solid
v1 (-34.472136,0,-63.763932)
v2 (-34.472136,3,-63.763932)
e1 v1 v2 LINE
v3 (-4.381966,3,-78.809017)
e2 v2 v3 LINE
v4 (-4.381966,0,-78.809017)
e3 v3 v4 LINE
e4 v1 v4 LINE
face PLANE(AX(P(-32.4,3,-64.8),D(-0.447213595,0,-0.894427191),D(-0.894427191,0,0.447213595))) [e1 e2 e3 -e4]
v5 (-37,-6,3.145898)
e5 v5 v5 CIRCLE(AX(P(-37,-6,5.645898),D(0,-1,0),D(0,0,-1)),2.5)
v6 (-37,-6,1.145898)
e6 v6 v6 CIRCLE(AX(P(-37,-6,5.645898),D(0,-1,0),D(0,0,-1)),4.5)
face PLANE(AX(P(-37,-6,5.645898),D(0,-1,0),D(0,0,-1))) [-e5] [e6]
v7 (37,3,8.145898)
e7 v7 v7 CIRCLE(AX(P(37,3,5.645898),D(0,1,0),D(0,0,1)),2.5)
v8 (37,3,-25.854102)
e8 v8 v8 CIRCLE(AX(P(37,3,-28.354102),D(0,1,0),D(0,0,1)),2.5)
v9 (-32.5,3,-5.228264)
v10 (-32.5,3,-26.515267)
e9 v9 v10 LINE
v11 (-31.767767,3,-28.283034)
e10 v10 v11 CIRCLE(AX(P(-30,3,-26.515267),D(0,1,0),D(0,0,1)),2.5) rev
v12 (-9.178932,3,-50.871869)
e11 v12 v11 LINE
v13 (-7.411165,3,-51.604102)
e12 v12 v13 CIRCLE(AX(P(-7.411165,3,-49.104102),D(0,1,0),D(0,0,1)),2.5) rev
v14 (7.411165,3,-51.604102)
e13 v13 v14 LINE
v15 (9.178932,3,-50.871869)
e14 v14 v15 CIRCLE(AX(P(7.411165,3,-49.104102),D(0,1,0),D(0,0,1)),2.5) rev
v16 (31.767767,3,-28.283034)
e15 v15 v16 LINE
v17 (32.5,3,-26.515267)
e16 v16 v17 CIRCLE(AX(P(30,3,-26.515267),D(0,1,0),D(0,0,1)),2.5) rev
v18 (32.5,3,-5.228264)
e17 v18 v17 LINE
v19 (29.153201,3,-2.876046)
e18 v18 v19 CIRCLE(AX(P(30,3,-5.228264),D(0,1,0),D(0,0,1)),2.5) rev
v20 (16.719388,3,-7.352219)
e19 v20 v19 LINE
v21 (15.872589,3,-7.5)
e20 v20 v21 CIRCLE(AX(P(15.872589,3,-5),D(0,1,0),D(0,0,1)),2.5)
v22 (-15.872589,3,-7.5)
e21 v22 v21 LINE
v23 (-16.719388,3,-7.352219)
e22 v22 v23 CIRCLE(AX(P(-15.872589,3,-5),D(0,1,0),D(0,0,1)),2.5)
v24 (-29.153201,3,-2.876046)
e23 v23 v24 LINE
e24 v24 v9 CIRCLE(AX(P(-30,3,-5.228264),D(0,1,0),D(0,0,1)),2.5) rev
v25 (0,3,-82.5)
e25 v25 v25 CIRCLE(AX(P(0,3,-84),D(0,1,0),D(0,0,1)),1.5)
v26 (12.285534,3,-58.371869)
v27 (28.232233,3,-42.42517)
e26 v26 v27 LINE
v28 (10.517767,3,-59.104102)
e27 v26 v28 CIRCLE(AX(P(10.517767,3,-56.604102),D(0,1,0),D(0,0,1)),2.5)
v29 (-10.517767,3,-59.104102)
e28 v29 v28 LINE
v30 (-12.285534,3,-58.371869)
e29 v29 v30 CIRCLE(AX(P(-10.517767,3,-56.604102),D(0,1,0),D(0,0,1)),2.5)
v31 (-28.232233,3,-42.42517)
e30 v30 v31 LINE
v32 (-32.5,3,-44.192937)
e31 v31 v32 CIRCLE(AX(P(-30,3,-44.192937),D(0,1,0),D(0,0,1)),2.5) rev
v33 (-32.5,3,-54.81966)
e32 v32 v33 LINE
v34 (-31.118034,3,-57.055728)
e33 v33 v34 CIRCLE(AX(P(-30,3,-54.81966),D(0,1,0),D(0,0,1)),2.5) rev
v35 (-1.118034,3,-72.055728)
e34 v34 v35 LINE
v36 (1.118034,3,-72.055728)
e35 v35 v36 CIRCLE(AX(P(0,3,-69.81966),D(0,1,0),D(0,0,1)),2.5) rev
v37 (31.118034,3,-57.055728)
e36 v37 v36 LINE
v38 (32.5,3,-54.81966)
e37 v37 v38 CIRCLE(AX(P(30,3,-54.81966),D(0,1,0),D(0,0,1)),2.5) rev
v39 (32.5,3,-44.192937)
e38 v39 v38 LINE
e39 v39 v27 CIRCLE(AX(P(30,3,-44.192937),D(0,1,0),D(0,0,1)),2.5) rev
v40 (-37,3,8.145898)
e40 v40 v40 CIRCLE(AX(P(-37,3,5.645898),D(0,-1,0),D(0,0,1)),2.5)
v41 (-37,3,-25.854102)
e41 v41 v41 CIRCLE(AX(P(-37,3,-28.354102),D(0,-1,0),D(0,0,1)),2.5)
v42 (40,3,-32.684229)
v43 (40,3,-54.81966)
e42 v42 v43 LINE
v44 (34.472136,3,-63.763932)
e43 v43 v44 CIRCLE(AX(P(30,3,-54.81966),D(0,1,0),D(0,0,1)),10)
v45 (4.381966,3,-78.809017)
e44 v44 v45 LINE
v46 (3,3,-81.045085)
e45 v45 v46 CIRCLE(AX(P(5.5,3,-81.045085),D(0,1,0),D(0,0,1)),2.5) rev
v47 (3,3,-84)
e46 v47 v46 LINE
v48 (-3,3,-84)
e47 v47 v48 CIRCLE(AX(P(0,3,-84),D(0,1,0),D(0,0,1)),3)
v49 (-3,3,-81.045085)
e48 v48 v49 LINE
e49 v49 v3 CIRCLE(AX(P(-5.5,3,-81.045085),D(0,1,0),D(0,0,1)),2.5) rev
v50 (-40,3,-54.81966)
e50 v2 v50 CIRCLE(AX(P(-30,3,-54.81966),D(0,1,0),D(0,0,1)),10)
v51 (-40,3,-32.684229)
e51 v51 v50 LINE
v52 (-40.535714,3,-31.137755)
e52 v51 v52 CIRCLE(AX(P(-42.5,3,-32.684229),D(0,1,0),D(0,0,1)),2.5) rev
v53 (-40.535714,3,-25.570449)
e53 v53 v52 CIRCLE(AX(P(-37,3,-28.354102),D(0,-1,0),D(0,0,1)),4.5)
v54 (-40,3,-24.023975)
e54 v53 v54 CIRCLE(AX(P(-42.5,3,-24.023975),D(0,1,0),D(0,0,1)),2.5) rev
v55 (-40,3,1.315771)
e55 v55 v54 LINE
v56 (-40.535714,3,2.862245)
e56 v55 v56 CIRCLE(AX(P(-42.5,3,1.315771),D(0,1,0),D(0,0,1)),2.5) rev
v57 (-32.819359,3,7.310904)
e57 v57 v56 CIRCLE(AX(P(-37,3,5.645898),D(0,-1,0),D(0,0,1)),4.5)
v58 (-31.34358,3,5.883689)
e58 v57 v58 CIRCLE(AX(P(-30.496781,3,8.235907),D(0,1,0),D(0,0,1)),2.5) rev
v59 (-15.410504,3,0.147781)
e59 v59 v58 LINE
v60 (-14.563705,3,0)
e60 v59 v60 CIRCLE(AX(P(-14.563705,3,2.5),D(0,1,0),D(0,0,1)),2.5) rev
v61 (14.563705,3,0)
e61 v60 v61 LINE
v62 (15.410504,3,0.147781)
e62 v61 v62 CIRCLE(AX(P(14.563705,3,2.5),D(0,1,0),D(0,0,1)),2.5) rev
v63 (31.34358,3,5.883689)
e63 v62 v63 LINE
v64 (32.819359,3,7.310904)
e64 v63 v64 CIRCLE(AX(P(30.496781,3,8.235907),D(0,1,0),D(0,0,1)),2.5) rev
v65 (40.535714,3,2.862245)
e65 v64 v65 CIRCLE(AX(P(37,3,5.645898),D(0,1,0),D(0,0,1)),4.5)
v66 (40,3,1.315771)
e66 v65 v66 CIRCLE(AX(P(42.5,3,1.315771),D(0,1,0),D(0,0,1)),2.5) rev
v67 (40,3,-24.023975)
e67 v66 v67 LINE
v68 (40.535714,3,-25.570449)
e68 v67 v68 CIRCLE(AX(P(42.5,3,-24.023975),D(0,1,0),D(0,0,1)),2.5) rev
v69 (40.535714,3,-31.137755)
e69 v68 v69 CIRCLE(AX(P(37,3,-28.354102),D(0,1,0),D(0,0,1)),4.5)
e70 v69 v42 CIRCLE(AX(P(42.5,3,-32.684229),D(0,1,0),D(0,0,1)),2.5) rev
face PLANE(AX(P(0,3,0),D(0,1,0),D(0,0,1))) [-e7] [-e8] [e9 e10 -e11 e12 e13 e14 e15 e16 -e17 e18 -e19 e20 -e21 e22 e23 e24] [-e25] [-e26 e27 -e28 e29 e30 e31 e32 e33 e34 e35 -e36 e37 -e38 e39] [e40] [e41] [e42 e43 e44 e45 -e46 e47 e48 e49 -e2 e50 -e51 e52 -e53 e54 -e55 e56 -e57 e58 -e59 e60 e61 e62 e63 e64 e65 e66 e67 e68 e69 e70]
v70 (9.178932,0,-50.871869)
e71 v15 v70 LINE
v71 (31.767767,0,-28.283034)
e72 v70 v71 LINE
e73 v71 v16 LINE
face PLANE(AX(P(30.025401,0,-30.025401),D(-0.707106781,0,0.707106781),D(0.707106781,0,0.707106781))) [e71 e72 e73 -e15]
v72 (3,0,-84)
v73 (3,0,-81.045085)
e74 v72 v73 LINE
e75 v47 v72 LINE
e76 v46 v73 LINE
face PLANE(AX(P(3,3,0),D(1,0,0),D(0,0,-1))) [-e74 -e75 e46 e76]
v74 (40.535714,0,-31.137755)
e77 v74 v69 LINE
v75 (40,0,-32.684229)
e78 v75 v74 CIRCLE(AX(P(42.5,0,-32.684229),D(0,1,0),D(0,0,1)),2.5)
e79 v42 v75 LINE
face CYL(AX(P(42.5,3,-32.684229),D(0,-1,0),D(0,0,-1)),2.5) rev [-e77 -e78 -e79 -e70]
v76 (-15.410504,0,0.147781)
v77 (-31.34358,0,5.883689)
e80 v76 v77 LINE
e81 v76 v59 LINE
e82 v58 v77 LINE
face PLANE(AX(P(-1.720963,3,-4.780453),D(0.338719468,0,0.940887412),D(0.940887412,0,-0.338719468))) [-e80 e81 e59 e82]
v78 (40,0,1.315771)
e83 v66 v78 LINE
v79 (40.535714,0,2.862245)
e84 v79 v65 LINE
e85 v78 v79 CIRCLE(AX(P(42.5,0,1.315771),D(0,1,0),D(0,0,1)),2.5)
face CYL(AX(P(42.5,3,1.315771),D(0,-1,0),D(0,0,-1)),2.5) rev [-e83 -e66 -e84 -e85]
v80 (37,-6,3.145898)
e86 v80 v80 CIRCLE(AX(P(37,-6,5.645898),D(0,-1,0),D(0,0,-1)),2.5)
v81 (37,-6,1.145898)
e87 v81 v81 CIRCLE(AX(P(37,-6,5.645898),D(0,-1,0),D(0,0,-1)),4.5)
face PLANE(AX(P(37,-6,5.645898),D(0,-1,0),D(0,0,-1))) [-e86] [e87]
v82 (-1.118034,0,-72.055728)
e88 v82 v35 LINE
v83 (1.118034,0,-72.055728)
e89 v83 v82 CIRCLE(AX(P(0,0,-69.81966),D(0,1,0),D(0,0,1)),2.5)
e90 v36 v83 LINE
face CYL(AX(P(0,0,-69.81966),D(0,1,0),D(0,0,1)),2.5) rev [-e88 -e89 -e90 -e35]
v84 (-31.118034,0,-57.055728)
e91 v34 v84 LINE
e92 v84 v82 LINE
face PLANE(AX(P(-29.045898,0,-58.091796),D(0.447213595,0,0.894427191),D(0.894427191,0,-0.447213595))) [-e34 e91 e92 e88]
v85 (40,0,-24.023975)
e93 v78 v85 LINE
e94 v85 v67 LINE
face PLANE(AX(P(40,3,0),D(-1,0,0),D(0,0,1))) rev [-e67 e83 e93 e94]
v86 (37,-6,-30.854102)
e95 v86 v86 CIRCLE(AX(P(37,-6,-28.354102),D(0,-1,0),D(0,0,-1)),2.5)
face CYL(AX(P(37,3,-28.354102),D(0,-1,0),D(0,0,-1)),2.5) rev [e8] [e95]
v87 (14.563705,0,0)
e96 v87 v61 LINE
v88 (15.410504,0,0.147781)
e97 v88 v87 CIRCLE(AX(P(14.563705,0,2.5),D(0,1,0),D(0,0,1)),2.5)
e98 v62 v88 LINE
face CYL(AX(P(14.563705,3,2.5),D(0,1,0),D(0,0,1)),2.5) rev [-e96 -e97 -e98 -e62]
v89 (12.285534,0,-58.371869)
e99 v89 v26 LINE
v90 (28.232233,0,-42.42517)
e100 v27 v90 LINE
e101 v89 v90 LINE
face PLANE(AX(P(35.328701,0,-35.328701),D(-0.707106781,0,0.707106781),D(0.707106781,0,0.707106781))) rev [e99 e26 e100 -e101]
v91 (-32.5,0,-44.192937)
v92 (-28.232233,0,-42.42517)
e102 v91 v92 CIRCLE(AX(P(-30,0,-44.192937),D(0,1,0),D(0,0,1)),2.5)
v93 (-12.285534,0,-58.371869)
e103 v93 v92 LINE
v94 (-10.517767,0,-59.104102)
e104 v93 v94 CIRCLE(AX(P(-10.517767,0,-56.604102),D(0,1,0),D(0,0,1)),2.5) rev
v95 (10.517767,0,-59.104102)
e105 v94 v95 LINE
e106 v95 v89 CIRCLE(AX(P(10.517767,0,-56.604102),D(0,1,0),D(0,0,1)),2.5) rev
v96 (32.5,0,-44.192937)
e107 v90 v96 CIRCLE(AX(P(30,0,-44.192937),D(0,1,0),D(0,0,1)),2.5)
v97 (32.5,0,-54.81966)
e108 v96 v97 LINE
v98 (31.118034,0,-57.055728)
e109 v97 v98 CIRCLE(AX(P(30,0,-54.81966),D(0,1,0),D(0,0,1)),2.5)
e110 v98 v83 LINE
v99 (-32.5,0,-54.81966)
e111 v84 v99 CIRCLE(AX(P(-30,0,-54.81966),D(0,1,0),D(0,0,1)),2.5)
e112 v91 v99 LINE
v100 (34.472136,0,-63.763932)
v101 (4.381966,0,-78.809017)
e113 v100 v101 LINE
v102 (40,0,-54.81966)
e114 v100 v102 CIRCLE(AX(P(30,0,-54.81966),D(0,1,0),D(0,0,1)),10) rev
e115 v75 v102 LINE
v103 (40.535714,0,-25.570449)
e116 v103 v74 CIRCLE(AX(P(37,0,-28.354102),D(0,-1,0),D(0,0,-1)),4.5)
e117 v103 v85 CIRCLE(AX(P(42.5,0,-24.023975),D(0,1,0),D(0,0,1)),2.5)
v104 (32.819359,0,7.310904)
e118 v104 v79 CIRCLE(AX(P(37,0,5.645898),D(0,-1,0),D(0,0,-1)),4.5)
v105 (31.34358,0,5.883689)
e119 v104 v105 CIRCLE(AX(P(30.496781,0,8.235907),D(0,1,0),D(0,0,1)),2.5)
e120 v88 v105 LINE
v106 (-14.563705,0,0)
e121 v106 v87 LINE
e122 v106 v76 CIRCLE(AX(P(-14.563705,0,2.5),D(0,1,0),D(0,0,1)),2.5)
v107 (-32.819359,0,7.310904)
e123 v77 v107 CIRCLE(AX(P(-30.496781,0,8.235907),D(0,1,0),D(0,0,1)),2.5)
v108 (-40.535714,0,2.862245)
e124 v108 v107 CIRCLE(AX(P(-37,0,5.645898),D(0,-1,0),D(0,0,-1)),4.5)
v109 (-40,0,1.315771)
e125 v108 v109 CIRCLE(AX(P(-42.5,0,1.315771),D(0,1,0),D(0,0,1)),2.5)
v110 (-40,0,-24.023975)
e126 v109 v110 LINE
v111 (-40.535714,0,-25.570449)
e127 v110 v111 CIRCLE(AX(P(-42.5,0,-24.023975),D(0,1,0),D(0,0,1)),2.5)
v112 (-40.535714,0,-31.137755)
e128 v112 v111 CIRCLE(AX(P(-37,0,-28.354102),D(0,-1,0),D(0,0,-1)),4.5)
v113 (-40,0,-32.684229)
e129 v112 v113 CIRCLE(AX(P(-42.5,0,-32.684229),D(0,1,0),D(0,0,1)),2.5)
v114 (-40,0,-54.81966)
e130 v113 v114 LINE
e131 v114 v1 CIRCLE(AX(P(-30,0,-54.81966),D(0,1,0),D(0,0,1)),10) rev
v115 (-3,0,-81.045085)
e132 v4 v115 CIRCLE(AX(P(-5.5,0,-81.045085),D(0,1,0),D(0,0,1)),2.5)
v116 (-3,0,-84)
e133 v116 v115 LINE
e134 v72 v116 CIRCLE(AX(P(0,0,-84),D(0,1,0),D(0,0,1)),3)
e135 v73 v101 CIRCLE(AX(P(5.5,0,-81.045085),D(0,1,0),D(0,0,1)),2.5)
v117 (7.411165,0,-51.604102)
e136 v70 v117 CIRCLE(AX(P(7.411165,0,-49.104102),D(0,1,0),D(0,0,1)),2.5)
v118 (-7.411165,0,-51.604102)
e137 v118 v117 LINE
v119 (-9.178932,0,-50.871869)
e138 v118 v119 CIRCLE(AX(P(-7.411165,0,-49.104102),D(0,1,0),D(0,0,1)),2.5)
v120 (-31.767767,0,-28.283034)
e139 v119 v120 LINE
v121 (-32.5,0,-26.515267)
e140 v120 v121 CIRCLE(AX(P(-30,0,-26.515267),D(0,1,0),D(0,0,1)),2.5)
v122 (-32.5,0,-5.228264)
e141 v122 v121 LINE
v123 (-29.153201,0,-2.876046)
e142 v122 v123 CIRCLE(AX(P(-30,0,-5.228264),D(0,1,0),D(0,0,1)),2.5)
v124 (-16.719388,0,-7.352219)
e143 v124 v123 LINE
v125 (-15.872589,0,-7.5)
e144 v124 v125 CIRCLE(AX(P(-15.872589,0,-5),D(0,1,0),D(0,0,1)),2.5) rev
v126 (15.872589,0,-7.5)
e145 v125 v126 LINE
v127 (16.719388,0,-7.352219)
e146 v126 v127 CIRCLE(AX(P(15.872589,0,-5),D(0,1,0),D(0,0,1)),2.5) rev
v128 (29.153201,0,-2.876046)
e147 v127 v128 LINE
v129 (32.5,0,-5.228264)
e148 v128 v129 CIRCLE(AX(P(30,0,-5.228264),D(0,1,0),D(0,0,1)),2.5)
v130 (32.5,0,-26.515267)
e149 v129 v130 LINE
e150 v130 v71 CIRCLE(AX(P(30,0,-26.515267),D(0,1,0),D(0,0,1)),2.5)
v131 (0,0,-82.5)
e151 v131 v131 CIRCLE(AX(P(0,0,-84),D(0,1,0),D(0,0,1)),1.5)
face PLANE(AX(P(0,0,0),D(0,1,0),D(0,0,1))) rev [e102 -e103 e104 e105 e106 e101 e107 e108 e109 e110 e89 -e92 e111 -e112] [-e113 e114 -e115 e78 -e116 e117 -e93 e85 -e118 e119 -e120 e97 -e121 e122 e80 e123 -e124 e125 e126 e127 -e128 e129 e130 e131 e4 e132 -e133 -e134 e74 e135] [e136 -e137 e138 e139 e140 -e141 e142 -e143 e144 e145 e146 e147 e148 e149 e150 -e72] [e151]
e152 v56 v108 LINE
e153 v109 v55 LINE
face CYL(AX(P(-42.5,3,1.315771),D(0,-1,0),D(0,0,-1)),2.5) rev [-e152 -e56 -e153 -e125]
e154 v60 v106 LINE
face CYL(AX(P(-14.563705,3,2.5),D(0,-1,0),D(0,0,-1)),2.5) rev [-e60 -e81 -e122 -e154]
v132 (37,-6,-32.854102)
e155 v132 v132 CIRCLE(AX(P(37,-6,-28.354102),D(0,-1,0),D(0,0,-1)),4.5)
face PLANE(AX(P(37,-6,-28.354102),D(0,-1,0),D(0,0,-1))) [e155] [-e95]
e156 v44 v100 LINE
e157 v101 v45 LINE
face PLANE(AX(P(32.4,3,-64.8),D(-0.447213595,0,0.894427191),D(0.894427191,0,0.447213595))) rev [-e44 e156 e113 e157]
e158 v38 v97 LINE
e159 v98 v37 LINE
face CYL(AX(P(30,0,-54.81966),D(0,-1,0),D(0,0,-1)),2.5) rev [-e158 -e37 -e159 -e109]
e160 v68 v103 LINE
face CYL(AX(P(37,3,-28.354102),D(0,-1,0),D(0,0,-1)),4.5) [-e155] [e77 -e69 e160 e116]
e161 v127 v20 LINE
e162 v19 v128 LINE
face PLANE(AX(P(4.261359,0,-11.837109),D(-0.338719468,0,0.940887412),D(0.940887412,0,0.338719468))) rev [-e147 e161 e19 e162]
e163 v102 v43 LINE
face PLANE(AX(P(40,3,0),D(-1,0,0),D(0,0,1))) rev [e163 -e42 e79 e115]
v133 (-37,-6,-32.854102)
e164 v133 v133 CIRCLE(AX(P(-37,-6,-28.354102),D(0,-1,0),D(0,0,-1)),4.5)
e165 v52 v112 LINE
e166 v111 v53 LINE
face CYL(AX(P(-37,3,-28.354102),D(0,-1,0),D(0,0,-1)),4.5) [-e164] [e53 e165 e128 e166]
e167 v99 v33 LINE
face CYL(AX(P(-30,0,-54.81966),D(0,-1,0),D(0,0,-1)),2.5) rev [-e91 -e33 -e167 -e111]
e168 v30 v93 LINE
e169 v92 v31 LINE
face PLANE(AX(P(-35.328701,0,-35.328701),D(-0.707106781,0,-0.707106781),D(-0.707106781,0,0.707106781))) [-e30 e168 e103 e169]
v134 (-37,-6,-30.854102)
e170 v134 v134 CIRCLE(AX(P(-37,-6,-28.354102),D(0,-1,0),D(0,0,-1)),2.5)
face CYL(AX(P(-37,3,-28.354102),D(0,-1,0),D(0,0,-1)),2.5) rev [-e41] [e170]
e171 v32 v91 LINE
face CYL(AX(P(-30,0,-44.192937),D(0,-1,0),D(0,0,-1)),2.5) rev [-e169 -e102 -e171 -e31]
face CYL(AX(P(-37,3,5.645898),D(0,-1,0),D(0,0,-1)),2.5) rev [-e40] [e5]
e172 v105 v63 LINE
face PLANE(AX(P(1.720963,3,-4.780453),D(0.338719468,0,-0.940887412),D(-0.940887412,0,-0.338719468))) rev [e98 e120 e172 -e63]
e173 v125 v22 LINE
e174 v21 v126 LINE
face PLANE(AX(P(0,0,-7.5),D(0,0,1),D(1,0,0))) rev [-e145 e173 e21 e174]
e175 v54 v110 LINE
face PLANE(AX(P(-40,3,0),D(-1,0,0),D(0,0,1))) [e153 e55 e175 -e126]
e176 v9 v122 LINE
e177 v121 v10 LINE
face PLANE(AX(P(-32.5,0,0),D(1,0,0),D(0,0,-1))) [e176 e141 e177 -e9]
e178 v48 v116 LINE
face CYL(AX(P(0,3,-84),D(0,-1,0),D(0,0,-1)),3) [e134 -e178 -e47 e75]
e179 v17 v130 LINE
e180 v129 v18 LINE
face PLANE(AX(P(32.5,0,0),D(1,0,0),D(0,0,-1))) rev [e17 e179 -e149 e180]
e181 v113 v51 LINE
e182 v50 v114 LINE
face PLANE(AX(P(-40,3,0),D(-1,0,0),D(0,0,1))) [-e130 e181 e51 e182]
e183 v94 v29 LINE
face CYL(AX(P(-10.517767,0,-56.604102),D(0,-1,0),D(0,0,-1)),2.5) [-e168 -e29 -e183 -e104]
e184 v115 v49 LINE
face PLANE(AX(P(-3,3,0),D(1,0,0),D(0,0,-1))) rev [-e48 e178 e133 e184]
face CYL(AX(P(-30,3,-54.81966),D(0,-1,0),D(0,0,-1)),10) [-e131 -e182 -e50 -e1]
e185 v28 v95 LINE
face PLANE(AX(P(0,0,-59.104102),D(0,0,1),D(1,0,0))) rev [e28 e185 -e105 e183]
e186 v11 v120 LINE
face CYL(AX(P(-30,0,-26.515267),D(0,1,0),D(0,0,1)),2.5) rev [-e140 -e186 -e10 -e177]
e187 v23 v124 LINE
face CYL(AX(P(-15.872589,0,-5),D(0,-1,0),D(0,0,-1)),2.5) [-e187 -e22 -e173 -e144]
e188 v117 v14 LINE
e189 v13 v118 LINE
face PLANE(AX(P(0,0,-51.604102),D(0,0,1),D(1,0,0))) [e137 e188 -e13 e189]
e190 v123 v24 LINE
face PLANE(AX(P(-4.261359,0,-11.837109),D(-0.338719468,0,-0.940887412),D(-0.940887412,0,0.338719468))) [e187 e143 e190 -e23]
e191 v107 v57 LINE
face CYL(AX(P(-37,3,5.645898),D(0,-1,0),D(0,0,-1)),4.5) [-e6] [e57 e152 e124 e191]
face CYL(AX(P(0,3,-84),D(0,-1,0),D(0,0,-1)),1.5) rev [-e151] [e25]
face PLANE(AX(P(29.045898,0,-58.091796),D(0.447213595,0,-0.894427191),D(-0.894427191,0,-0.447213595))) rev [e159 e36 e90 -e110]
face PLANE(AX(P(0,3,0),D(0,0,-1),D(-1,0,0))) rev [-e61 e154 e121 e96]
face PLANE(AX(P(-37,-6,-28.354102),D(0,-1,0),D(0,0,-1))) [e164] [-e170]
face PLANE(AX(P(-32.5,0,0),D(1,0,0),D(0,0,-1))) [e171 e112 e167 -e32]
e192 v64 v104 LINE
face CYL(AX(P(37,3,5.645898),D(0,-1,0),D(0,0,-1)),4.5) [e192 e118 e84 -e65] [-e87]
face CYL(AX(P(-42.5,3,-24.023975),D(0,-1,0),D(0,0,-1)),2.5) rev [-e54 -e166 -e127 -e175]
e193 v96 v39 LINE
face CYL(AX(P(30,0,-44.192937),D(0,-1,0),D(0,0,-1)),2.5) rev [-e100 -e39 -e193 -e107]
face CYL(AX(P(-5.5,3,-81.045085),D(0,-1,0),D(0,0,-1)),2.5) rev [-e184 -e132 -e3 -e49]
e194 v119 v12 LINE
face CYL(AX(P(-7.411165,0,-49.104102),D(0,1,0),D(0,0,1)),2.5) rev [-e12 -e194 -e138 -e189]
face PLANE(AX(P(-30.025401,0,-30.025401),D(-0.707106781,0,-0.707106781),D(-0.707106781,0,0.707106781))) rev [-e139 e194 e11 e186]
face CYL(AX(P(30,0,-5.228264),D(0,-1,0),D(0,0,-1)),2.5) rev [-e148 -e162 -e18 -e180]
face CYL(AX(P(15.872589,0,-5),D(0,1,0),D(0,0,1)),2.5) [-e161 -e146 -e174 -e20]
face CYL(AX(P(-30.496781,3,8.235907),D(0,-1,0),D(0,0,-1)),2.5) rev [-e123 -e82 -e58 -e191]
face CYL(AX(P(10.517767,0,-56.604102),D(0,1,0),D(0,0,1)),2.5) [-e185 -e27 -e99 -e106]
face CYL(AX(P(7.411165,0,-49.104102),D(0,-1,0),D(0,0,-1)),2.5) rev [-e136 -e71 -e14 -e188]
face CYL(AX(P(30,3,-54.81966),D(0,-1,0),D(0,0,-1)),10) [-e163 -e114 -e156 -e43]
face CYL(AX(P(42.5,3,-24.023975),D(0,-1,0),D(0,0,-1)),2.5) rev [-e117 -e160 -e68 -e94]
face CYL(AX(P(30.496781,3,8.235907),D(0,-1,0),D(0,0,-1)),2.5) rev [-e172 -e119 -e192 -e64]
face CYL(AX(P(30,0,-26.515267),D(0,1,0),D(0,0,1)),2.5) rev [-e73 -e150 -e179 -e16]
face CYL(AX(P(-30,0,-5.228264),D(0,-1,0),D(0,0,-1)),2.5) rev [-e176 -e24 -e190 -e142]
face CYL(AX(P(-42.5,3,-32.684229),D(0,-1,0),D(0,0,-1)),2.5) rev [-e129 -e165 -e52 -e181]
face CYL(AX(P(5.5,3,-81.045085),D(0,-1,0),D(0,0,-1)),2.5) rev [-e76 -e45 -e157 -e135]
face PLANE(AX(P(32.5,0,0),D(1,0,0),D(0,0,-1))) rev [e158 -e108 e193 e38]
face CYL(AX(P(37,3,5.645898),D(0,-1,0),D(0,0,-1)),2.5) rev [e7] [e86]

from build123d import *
from build123d.topology import SkipClean

# Parameters (mm, degrees)
SKETCH1_R            = 2.5
BOSS_EXTRUDE1_DEPTH  = 3
CUT_EXTRUDE2_START   = -3
CUT_EXTRUDE2_DEPTH   = 3
FILLET2_R            = 10
FILLET2_OF_MIRROR1_R = 10
FILLET3_R            = 2.5
BOSS_EXTRUDE2_START  = 6
SKETCH4_R            = 4.5
SKETCH4_R_2          = 2.5
BOSS_EXTRUDE2_DEPTH  = 6


# Read off the part's stored shape, not the designer's step: Cut-Extrude2
with BuildPart() as part:
    # Sketch1 → Boss-Extrude1 (new body)
    with BuildSketch(Plane(origin=(0, 0, 0), x_dir=(1, 0, 0), z_dir=(0, 1, 0))):
        with BuildLine():
            Line((0, 0), (15, 0))
            Line((15, 0), (32.55050158, -6.318180569))
            ThreePointArc((32.55050158, -6.318180569), (39.139673913, -9.604659904), (40, -2.291796068))
            Line((40, -2.291796068), (40, 25))
            ThreePointArc((40, 25), (41.5, 28.354101966), (40, 31.708203932))
            Line((40, 31.708203932), (40, 61))
            Line((40, 61), (3, 79.5))
            Line((3, 79.5), (3, 84))
            ThreePointArc((3, 84), (2.121320344, 86.121320344), (0, 87))
            Line((0, 87), (0, 85.5))
            ThreePointArc((0, 85.5), (1.5, 84), (0, 82.5))
            Line((0, 82.5), (0, 0))
        make_face()
        with Locations(Location((37, -5.645898034, 0), (0, 0, 270))):
            Circle(SKETCH1_R, mode=Mode.SUBTRACT)
        with Locations(Location((37, 28.354101966, 0), (0, 0, 270))):
            Circle(SKETCH1_R, mode=Mode.SUBTRACT)
    boss_extrude1 = extrude(amount=BOSS_EXTRUDE1_DEPTH)

    # Cut-Extrude2 outline → Cut-Extrude2 (cut)
    with BuildSketch(Plane(origin=(0, 3, 0), x_dir=(1, 0, 0), z_dir=(0, 1, 0)).offset(CUT_EXTRUDE2_START)):
        Polygon((0, 7.5), (16.308883759, 7.5), (32.5, 1.671198153), (32.5, 27.550801107), (8.446699141, 51.604101966), (0, 51.604101966), align=None)
        Polygon((0, 72.614745084), (0, 59.104101966), (11.553300859, 59.104101966), (32.5, 38.157402825), (32.5, 56.364745084), align=None)
    cut_extrude2 = extrude(amount=CUT_EXTRUDE2_DEPTH, mode=Mode.SUBTRACT)

    # Fillet2
    fillet2_edges = [part.edges().sort_by_distance(p)[0] for p in [
        (40, 1.5, -61),
    ]]
    fillet(fillet2_edges, radius=FILLET2_R)

    # Mirror1: Boss-Extrude1, Cut-Extrude2 across plane
    with SkipClean():  # the faces are left unmerged after this step: merging them gives an invalid solid
        add(boss_extrude1.mirror(Plane(origin=(0, 0, 0), x_dir=(0, 0, 1), z_dir=(1, 0, 0))))
        add(cut_extrude2.mirror(Plane(origin=(0, 0, 0), x_dir=(0, 0, 1), z_dir=(1, 0, 0))), mode=Mode.SUBTRACT)

    # Fillet2 of Mirror1
    fillet2_of_mirror1_edges = [part.edges().sort_by_distance(p)[0] for p in [
        (-40, 1.5, -61),
    ]]
    fillet(fillet2_of_mirror1_edges, radius=FILLET2_OF_MIRROR1_R)

    # Fillet3
    fillet3_edges = [part.edges().sort_by_distance(p)[0] for p in [
        (-40, 1.5, 2.291796068),
        (-32.55050158, 1.5, 6.318180569),
        (-15, 1.5, 0),
        (-3, 1.5, -79.5),
        (-40, 1.5, -31.708203932),
        (-40, 1.5, -25),
        (-16.308883759, 1.5, -7.5),
        (-32.5, 1.5, -1.671198153),
        (-32.5, 1.5, -27.550801107),
        (-8.446699141, 1.5, -51.604101966),
        (-11.553300859, 1.5, -59.104101966),
        (-32.5, 1.5, -38.157402825),
        (-32.5, 1.5, -56.364745084),
        (32.55050158, 1.5, 6.318180569),
        (15, 1.5, 0),
        (3, 1.5, -79.5),
        (40, 1.5, -31.708203932),
        (40, 1.5, -25),
        (40, 1.5, 2.291796068),
        (32.5, 1.5, -1.671198153),
        (16.308883759, 1.5, -7.5),
        (8.446699141, 1.5, -51.604101966),
        (32.5, 1.5, -27.550801107),
        (32.5, 1.5, -38.157402825),
        (11.553300859, 1.5, -59.104101966),
        (0, 1.5, -72.614745084),
        (32.5, 1.5, -56.364745084),
    ]]
    fillet(fillet3_edges, radius=FILLET3_R)

    # Sketch4 → Boss-Extrude2 (add)
    # profile 1 of 4: a face of its own
    with SkipClean():  # the faces are left unmerged after this step: merging them gives an invalid solid
        with BuildSketch(Plane.XZ.offset(BOSS_EXTRUDE2_START)):
            with Locations(Location((37, -28.354101966, 0), (0, 0, 270))):
                Circle(SKETCH4_R)
            with Locations(Location((37, -28.354101966, 0), (0, 0, 270))):
                Circle(SKETCH4_R_2, mode=Mode.SUBTRACT)
        # profile 2 of 4: a face of its own
        with BuildSketch(Plane.XZ.offset(BOSS_EXTRUDE2_START)):
            with Locations(Location((37, 5.645898034, 0), (0, 0, 270))):
                Circle(SKETCH4_R)
            with Locations(Location((37, 5.645898034, 0), (0, 0, 270))):
                Circle(SKETCH4_R_2, mode=Mode.SUBTRACT)
        # profile 3 of 4: a face of its own
        with BuildSketch(Plane.XZ.offset(BOSS_EXTRUDE2_START)):
            with Locations(Location((-37, -28.354101966, 0), (0, 0, 270))):
                Circle(SKETCH4_R)
            with Locations(Location((-37, -28.354101966, 0), (0, 0, 270))):
                Circle(SKETCH4_R_2, mode=Mode.SUBTRACT)
        # profile 4 of 4: a face of its own
        with BuildSketch(Plane.XZ.offset(BOSS_EXTRUDE2_START)):
            with Locations(Location((-37, 5.645898034, 0), (0, 0, 270))):
                Circle(SKETCH4_R)
            with Locations(Location((-37, 5.645898034, 0), (0, 0, 270))):
                Circle(SKETCH4_R_2, mode=Mode.SUBTRACT)
        extrude(amount=-BOSS_EXTRUDE2_DEPTH)


solid = part.part
